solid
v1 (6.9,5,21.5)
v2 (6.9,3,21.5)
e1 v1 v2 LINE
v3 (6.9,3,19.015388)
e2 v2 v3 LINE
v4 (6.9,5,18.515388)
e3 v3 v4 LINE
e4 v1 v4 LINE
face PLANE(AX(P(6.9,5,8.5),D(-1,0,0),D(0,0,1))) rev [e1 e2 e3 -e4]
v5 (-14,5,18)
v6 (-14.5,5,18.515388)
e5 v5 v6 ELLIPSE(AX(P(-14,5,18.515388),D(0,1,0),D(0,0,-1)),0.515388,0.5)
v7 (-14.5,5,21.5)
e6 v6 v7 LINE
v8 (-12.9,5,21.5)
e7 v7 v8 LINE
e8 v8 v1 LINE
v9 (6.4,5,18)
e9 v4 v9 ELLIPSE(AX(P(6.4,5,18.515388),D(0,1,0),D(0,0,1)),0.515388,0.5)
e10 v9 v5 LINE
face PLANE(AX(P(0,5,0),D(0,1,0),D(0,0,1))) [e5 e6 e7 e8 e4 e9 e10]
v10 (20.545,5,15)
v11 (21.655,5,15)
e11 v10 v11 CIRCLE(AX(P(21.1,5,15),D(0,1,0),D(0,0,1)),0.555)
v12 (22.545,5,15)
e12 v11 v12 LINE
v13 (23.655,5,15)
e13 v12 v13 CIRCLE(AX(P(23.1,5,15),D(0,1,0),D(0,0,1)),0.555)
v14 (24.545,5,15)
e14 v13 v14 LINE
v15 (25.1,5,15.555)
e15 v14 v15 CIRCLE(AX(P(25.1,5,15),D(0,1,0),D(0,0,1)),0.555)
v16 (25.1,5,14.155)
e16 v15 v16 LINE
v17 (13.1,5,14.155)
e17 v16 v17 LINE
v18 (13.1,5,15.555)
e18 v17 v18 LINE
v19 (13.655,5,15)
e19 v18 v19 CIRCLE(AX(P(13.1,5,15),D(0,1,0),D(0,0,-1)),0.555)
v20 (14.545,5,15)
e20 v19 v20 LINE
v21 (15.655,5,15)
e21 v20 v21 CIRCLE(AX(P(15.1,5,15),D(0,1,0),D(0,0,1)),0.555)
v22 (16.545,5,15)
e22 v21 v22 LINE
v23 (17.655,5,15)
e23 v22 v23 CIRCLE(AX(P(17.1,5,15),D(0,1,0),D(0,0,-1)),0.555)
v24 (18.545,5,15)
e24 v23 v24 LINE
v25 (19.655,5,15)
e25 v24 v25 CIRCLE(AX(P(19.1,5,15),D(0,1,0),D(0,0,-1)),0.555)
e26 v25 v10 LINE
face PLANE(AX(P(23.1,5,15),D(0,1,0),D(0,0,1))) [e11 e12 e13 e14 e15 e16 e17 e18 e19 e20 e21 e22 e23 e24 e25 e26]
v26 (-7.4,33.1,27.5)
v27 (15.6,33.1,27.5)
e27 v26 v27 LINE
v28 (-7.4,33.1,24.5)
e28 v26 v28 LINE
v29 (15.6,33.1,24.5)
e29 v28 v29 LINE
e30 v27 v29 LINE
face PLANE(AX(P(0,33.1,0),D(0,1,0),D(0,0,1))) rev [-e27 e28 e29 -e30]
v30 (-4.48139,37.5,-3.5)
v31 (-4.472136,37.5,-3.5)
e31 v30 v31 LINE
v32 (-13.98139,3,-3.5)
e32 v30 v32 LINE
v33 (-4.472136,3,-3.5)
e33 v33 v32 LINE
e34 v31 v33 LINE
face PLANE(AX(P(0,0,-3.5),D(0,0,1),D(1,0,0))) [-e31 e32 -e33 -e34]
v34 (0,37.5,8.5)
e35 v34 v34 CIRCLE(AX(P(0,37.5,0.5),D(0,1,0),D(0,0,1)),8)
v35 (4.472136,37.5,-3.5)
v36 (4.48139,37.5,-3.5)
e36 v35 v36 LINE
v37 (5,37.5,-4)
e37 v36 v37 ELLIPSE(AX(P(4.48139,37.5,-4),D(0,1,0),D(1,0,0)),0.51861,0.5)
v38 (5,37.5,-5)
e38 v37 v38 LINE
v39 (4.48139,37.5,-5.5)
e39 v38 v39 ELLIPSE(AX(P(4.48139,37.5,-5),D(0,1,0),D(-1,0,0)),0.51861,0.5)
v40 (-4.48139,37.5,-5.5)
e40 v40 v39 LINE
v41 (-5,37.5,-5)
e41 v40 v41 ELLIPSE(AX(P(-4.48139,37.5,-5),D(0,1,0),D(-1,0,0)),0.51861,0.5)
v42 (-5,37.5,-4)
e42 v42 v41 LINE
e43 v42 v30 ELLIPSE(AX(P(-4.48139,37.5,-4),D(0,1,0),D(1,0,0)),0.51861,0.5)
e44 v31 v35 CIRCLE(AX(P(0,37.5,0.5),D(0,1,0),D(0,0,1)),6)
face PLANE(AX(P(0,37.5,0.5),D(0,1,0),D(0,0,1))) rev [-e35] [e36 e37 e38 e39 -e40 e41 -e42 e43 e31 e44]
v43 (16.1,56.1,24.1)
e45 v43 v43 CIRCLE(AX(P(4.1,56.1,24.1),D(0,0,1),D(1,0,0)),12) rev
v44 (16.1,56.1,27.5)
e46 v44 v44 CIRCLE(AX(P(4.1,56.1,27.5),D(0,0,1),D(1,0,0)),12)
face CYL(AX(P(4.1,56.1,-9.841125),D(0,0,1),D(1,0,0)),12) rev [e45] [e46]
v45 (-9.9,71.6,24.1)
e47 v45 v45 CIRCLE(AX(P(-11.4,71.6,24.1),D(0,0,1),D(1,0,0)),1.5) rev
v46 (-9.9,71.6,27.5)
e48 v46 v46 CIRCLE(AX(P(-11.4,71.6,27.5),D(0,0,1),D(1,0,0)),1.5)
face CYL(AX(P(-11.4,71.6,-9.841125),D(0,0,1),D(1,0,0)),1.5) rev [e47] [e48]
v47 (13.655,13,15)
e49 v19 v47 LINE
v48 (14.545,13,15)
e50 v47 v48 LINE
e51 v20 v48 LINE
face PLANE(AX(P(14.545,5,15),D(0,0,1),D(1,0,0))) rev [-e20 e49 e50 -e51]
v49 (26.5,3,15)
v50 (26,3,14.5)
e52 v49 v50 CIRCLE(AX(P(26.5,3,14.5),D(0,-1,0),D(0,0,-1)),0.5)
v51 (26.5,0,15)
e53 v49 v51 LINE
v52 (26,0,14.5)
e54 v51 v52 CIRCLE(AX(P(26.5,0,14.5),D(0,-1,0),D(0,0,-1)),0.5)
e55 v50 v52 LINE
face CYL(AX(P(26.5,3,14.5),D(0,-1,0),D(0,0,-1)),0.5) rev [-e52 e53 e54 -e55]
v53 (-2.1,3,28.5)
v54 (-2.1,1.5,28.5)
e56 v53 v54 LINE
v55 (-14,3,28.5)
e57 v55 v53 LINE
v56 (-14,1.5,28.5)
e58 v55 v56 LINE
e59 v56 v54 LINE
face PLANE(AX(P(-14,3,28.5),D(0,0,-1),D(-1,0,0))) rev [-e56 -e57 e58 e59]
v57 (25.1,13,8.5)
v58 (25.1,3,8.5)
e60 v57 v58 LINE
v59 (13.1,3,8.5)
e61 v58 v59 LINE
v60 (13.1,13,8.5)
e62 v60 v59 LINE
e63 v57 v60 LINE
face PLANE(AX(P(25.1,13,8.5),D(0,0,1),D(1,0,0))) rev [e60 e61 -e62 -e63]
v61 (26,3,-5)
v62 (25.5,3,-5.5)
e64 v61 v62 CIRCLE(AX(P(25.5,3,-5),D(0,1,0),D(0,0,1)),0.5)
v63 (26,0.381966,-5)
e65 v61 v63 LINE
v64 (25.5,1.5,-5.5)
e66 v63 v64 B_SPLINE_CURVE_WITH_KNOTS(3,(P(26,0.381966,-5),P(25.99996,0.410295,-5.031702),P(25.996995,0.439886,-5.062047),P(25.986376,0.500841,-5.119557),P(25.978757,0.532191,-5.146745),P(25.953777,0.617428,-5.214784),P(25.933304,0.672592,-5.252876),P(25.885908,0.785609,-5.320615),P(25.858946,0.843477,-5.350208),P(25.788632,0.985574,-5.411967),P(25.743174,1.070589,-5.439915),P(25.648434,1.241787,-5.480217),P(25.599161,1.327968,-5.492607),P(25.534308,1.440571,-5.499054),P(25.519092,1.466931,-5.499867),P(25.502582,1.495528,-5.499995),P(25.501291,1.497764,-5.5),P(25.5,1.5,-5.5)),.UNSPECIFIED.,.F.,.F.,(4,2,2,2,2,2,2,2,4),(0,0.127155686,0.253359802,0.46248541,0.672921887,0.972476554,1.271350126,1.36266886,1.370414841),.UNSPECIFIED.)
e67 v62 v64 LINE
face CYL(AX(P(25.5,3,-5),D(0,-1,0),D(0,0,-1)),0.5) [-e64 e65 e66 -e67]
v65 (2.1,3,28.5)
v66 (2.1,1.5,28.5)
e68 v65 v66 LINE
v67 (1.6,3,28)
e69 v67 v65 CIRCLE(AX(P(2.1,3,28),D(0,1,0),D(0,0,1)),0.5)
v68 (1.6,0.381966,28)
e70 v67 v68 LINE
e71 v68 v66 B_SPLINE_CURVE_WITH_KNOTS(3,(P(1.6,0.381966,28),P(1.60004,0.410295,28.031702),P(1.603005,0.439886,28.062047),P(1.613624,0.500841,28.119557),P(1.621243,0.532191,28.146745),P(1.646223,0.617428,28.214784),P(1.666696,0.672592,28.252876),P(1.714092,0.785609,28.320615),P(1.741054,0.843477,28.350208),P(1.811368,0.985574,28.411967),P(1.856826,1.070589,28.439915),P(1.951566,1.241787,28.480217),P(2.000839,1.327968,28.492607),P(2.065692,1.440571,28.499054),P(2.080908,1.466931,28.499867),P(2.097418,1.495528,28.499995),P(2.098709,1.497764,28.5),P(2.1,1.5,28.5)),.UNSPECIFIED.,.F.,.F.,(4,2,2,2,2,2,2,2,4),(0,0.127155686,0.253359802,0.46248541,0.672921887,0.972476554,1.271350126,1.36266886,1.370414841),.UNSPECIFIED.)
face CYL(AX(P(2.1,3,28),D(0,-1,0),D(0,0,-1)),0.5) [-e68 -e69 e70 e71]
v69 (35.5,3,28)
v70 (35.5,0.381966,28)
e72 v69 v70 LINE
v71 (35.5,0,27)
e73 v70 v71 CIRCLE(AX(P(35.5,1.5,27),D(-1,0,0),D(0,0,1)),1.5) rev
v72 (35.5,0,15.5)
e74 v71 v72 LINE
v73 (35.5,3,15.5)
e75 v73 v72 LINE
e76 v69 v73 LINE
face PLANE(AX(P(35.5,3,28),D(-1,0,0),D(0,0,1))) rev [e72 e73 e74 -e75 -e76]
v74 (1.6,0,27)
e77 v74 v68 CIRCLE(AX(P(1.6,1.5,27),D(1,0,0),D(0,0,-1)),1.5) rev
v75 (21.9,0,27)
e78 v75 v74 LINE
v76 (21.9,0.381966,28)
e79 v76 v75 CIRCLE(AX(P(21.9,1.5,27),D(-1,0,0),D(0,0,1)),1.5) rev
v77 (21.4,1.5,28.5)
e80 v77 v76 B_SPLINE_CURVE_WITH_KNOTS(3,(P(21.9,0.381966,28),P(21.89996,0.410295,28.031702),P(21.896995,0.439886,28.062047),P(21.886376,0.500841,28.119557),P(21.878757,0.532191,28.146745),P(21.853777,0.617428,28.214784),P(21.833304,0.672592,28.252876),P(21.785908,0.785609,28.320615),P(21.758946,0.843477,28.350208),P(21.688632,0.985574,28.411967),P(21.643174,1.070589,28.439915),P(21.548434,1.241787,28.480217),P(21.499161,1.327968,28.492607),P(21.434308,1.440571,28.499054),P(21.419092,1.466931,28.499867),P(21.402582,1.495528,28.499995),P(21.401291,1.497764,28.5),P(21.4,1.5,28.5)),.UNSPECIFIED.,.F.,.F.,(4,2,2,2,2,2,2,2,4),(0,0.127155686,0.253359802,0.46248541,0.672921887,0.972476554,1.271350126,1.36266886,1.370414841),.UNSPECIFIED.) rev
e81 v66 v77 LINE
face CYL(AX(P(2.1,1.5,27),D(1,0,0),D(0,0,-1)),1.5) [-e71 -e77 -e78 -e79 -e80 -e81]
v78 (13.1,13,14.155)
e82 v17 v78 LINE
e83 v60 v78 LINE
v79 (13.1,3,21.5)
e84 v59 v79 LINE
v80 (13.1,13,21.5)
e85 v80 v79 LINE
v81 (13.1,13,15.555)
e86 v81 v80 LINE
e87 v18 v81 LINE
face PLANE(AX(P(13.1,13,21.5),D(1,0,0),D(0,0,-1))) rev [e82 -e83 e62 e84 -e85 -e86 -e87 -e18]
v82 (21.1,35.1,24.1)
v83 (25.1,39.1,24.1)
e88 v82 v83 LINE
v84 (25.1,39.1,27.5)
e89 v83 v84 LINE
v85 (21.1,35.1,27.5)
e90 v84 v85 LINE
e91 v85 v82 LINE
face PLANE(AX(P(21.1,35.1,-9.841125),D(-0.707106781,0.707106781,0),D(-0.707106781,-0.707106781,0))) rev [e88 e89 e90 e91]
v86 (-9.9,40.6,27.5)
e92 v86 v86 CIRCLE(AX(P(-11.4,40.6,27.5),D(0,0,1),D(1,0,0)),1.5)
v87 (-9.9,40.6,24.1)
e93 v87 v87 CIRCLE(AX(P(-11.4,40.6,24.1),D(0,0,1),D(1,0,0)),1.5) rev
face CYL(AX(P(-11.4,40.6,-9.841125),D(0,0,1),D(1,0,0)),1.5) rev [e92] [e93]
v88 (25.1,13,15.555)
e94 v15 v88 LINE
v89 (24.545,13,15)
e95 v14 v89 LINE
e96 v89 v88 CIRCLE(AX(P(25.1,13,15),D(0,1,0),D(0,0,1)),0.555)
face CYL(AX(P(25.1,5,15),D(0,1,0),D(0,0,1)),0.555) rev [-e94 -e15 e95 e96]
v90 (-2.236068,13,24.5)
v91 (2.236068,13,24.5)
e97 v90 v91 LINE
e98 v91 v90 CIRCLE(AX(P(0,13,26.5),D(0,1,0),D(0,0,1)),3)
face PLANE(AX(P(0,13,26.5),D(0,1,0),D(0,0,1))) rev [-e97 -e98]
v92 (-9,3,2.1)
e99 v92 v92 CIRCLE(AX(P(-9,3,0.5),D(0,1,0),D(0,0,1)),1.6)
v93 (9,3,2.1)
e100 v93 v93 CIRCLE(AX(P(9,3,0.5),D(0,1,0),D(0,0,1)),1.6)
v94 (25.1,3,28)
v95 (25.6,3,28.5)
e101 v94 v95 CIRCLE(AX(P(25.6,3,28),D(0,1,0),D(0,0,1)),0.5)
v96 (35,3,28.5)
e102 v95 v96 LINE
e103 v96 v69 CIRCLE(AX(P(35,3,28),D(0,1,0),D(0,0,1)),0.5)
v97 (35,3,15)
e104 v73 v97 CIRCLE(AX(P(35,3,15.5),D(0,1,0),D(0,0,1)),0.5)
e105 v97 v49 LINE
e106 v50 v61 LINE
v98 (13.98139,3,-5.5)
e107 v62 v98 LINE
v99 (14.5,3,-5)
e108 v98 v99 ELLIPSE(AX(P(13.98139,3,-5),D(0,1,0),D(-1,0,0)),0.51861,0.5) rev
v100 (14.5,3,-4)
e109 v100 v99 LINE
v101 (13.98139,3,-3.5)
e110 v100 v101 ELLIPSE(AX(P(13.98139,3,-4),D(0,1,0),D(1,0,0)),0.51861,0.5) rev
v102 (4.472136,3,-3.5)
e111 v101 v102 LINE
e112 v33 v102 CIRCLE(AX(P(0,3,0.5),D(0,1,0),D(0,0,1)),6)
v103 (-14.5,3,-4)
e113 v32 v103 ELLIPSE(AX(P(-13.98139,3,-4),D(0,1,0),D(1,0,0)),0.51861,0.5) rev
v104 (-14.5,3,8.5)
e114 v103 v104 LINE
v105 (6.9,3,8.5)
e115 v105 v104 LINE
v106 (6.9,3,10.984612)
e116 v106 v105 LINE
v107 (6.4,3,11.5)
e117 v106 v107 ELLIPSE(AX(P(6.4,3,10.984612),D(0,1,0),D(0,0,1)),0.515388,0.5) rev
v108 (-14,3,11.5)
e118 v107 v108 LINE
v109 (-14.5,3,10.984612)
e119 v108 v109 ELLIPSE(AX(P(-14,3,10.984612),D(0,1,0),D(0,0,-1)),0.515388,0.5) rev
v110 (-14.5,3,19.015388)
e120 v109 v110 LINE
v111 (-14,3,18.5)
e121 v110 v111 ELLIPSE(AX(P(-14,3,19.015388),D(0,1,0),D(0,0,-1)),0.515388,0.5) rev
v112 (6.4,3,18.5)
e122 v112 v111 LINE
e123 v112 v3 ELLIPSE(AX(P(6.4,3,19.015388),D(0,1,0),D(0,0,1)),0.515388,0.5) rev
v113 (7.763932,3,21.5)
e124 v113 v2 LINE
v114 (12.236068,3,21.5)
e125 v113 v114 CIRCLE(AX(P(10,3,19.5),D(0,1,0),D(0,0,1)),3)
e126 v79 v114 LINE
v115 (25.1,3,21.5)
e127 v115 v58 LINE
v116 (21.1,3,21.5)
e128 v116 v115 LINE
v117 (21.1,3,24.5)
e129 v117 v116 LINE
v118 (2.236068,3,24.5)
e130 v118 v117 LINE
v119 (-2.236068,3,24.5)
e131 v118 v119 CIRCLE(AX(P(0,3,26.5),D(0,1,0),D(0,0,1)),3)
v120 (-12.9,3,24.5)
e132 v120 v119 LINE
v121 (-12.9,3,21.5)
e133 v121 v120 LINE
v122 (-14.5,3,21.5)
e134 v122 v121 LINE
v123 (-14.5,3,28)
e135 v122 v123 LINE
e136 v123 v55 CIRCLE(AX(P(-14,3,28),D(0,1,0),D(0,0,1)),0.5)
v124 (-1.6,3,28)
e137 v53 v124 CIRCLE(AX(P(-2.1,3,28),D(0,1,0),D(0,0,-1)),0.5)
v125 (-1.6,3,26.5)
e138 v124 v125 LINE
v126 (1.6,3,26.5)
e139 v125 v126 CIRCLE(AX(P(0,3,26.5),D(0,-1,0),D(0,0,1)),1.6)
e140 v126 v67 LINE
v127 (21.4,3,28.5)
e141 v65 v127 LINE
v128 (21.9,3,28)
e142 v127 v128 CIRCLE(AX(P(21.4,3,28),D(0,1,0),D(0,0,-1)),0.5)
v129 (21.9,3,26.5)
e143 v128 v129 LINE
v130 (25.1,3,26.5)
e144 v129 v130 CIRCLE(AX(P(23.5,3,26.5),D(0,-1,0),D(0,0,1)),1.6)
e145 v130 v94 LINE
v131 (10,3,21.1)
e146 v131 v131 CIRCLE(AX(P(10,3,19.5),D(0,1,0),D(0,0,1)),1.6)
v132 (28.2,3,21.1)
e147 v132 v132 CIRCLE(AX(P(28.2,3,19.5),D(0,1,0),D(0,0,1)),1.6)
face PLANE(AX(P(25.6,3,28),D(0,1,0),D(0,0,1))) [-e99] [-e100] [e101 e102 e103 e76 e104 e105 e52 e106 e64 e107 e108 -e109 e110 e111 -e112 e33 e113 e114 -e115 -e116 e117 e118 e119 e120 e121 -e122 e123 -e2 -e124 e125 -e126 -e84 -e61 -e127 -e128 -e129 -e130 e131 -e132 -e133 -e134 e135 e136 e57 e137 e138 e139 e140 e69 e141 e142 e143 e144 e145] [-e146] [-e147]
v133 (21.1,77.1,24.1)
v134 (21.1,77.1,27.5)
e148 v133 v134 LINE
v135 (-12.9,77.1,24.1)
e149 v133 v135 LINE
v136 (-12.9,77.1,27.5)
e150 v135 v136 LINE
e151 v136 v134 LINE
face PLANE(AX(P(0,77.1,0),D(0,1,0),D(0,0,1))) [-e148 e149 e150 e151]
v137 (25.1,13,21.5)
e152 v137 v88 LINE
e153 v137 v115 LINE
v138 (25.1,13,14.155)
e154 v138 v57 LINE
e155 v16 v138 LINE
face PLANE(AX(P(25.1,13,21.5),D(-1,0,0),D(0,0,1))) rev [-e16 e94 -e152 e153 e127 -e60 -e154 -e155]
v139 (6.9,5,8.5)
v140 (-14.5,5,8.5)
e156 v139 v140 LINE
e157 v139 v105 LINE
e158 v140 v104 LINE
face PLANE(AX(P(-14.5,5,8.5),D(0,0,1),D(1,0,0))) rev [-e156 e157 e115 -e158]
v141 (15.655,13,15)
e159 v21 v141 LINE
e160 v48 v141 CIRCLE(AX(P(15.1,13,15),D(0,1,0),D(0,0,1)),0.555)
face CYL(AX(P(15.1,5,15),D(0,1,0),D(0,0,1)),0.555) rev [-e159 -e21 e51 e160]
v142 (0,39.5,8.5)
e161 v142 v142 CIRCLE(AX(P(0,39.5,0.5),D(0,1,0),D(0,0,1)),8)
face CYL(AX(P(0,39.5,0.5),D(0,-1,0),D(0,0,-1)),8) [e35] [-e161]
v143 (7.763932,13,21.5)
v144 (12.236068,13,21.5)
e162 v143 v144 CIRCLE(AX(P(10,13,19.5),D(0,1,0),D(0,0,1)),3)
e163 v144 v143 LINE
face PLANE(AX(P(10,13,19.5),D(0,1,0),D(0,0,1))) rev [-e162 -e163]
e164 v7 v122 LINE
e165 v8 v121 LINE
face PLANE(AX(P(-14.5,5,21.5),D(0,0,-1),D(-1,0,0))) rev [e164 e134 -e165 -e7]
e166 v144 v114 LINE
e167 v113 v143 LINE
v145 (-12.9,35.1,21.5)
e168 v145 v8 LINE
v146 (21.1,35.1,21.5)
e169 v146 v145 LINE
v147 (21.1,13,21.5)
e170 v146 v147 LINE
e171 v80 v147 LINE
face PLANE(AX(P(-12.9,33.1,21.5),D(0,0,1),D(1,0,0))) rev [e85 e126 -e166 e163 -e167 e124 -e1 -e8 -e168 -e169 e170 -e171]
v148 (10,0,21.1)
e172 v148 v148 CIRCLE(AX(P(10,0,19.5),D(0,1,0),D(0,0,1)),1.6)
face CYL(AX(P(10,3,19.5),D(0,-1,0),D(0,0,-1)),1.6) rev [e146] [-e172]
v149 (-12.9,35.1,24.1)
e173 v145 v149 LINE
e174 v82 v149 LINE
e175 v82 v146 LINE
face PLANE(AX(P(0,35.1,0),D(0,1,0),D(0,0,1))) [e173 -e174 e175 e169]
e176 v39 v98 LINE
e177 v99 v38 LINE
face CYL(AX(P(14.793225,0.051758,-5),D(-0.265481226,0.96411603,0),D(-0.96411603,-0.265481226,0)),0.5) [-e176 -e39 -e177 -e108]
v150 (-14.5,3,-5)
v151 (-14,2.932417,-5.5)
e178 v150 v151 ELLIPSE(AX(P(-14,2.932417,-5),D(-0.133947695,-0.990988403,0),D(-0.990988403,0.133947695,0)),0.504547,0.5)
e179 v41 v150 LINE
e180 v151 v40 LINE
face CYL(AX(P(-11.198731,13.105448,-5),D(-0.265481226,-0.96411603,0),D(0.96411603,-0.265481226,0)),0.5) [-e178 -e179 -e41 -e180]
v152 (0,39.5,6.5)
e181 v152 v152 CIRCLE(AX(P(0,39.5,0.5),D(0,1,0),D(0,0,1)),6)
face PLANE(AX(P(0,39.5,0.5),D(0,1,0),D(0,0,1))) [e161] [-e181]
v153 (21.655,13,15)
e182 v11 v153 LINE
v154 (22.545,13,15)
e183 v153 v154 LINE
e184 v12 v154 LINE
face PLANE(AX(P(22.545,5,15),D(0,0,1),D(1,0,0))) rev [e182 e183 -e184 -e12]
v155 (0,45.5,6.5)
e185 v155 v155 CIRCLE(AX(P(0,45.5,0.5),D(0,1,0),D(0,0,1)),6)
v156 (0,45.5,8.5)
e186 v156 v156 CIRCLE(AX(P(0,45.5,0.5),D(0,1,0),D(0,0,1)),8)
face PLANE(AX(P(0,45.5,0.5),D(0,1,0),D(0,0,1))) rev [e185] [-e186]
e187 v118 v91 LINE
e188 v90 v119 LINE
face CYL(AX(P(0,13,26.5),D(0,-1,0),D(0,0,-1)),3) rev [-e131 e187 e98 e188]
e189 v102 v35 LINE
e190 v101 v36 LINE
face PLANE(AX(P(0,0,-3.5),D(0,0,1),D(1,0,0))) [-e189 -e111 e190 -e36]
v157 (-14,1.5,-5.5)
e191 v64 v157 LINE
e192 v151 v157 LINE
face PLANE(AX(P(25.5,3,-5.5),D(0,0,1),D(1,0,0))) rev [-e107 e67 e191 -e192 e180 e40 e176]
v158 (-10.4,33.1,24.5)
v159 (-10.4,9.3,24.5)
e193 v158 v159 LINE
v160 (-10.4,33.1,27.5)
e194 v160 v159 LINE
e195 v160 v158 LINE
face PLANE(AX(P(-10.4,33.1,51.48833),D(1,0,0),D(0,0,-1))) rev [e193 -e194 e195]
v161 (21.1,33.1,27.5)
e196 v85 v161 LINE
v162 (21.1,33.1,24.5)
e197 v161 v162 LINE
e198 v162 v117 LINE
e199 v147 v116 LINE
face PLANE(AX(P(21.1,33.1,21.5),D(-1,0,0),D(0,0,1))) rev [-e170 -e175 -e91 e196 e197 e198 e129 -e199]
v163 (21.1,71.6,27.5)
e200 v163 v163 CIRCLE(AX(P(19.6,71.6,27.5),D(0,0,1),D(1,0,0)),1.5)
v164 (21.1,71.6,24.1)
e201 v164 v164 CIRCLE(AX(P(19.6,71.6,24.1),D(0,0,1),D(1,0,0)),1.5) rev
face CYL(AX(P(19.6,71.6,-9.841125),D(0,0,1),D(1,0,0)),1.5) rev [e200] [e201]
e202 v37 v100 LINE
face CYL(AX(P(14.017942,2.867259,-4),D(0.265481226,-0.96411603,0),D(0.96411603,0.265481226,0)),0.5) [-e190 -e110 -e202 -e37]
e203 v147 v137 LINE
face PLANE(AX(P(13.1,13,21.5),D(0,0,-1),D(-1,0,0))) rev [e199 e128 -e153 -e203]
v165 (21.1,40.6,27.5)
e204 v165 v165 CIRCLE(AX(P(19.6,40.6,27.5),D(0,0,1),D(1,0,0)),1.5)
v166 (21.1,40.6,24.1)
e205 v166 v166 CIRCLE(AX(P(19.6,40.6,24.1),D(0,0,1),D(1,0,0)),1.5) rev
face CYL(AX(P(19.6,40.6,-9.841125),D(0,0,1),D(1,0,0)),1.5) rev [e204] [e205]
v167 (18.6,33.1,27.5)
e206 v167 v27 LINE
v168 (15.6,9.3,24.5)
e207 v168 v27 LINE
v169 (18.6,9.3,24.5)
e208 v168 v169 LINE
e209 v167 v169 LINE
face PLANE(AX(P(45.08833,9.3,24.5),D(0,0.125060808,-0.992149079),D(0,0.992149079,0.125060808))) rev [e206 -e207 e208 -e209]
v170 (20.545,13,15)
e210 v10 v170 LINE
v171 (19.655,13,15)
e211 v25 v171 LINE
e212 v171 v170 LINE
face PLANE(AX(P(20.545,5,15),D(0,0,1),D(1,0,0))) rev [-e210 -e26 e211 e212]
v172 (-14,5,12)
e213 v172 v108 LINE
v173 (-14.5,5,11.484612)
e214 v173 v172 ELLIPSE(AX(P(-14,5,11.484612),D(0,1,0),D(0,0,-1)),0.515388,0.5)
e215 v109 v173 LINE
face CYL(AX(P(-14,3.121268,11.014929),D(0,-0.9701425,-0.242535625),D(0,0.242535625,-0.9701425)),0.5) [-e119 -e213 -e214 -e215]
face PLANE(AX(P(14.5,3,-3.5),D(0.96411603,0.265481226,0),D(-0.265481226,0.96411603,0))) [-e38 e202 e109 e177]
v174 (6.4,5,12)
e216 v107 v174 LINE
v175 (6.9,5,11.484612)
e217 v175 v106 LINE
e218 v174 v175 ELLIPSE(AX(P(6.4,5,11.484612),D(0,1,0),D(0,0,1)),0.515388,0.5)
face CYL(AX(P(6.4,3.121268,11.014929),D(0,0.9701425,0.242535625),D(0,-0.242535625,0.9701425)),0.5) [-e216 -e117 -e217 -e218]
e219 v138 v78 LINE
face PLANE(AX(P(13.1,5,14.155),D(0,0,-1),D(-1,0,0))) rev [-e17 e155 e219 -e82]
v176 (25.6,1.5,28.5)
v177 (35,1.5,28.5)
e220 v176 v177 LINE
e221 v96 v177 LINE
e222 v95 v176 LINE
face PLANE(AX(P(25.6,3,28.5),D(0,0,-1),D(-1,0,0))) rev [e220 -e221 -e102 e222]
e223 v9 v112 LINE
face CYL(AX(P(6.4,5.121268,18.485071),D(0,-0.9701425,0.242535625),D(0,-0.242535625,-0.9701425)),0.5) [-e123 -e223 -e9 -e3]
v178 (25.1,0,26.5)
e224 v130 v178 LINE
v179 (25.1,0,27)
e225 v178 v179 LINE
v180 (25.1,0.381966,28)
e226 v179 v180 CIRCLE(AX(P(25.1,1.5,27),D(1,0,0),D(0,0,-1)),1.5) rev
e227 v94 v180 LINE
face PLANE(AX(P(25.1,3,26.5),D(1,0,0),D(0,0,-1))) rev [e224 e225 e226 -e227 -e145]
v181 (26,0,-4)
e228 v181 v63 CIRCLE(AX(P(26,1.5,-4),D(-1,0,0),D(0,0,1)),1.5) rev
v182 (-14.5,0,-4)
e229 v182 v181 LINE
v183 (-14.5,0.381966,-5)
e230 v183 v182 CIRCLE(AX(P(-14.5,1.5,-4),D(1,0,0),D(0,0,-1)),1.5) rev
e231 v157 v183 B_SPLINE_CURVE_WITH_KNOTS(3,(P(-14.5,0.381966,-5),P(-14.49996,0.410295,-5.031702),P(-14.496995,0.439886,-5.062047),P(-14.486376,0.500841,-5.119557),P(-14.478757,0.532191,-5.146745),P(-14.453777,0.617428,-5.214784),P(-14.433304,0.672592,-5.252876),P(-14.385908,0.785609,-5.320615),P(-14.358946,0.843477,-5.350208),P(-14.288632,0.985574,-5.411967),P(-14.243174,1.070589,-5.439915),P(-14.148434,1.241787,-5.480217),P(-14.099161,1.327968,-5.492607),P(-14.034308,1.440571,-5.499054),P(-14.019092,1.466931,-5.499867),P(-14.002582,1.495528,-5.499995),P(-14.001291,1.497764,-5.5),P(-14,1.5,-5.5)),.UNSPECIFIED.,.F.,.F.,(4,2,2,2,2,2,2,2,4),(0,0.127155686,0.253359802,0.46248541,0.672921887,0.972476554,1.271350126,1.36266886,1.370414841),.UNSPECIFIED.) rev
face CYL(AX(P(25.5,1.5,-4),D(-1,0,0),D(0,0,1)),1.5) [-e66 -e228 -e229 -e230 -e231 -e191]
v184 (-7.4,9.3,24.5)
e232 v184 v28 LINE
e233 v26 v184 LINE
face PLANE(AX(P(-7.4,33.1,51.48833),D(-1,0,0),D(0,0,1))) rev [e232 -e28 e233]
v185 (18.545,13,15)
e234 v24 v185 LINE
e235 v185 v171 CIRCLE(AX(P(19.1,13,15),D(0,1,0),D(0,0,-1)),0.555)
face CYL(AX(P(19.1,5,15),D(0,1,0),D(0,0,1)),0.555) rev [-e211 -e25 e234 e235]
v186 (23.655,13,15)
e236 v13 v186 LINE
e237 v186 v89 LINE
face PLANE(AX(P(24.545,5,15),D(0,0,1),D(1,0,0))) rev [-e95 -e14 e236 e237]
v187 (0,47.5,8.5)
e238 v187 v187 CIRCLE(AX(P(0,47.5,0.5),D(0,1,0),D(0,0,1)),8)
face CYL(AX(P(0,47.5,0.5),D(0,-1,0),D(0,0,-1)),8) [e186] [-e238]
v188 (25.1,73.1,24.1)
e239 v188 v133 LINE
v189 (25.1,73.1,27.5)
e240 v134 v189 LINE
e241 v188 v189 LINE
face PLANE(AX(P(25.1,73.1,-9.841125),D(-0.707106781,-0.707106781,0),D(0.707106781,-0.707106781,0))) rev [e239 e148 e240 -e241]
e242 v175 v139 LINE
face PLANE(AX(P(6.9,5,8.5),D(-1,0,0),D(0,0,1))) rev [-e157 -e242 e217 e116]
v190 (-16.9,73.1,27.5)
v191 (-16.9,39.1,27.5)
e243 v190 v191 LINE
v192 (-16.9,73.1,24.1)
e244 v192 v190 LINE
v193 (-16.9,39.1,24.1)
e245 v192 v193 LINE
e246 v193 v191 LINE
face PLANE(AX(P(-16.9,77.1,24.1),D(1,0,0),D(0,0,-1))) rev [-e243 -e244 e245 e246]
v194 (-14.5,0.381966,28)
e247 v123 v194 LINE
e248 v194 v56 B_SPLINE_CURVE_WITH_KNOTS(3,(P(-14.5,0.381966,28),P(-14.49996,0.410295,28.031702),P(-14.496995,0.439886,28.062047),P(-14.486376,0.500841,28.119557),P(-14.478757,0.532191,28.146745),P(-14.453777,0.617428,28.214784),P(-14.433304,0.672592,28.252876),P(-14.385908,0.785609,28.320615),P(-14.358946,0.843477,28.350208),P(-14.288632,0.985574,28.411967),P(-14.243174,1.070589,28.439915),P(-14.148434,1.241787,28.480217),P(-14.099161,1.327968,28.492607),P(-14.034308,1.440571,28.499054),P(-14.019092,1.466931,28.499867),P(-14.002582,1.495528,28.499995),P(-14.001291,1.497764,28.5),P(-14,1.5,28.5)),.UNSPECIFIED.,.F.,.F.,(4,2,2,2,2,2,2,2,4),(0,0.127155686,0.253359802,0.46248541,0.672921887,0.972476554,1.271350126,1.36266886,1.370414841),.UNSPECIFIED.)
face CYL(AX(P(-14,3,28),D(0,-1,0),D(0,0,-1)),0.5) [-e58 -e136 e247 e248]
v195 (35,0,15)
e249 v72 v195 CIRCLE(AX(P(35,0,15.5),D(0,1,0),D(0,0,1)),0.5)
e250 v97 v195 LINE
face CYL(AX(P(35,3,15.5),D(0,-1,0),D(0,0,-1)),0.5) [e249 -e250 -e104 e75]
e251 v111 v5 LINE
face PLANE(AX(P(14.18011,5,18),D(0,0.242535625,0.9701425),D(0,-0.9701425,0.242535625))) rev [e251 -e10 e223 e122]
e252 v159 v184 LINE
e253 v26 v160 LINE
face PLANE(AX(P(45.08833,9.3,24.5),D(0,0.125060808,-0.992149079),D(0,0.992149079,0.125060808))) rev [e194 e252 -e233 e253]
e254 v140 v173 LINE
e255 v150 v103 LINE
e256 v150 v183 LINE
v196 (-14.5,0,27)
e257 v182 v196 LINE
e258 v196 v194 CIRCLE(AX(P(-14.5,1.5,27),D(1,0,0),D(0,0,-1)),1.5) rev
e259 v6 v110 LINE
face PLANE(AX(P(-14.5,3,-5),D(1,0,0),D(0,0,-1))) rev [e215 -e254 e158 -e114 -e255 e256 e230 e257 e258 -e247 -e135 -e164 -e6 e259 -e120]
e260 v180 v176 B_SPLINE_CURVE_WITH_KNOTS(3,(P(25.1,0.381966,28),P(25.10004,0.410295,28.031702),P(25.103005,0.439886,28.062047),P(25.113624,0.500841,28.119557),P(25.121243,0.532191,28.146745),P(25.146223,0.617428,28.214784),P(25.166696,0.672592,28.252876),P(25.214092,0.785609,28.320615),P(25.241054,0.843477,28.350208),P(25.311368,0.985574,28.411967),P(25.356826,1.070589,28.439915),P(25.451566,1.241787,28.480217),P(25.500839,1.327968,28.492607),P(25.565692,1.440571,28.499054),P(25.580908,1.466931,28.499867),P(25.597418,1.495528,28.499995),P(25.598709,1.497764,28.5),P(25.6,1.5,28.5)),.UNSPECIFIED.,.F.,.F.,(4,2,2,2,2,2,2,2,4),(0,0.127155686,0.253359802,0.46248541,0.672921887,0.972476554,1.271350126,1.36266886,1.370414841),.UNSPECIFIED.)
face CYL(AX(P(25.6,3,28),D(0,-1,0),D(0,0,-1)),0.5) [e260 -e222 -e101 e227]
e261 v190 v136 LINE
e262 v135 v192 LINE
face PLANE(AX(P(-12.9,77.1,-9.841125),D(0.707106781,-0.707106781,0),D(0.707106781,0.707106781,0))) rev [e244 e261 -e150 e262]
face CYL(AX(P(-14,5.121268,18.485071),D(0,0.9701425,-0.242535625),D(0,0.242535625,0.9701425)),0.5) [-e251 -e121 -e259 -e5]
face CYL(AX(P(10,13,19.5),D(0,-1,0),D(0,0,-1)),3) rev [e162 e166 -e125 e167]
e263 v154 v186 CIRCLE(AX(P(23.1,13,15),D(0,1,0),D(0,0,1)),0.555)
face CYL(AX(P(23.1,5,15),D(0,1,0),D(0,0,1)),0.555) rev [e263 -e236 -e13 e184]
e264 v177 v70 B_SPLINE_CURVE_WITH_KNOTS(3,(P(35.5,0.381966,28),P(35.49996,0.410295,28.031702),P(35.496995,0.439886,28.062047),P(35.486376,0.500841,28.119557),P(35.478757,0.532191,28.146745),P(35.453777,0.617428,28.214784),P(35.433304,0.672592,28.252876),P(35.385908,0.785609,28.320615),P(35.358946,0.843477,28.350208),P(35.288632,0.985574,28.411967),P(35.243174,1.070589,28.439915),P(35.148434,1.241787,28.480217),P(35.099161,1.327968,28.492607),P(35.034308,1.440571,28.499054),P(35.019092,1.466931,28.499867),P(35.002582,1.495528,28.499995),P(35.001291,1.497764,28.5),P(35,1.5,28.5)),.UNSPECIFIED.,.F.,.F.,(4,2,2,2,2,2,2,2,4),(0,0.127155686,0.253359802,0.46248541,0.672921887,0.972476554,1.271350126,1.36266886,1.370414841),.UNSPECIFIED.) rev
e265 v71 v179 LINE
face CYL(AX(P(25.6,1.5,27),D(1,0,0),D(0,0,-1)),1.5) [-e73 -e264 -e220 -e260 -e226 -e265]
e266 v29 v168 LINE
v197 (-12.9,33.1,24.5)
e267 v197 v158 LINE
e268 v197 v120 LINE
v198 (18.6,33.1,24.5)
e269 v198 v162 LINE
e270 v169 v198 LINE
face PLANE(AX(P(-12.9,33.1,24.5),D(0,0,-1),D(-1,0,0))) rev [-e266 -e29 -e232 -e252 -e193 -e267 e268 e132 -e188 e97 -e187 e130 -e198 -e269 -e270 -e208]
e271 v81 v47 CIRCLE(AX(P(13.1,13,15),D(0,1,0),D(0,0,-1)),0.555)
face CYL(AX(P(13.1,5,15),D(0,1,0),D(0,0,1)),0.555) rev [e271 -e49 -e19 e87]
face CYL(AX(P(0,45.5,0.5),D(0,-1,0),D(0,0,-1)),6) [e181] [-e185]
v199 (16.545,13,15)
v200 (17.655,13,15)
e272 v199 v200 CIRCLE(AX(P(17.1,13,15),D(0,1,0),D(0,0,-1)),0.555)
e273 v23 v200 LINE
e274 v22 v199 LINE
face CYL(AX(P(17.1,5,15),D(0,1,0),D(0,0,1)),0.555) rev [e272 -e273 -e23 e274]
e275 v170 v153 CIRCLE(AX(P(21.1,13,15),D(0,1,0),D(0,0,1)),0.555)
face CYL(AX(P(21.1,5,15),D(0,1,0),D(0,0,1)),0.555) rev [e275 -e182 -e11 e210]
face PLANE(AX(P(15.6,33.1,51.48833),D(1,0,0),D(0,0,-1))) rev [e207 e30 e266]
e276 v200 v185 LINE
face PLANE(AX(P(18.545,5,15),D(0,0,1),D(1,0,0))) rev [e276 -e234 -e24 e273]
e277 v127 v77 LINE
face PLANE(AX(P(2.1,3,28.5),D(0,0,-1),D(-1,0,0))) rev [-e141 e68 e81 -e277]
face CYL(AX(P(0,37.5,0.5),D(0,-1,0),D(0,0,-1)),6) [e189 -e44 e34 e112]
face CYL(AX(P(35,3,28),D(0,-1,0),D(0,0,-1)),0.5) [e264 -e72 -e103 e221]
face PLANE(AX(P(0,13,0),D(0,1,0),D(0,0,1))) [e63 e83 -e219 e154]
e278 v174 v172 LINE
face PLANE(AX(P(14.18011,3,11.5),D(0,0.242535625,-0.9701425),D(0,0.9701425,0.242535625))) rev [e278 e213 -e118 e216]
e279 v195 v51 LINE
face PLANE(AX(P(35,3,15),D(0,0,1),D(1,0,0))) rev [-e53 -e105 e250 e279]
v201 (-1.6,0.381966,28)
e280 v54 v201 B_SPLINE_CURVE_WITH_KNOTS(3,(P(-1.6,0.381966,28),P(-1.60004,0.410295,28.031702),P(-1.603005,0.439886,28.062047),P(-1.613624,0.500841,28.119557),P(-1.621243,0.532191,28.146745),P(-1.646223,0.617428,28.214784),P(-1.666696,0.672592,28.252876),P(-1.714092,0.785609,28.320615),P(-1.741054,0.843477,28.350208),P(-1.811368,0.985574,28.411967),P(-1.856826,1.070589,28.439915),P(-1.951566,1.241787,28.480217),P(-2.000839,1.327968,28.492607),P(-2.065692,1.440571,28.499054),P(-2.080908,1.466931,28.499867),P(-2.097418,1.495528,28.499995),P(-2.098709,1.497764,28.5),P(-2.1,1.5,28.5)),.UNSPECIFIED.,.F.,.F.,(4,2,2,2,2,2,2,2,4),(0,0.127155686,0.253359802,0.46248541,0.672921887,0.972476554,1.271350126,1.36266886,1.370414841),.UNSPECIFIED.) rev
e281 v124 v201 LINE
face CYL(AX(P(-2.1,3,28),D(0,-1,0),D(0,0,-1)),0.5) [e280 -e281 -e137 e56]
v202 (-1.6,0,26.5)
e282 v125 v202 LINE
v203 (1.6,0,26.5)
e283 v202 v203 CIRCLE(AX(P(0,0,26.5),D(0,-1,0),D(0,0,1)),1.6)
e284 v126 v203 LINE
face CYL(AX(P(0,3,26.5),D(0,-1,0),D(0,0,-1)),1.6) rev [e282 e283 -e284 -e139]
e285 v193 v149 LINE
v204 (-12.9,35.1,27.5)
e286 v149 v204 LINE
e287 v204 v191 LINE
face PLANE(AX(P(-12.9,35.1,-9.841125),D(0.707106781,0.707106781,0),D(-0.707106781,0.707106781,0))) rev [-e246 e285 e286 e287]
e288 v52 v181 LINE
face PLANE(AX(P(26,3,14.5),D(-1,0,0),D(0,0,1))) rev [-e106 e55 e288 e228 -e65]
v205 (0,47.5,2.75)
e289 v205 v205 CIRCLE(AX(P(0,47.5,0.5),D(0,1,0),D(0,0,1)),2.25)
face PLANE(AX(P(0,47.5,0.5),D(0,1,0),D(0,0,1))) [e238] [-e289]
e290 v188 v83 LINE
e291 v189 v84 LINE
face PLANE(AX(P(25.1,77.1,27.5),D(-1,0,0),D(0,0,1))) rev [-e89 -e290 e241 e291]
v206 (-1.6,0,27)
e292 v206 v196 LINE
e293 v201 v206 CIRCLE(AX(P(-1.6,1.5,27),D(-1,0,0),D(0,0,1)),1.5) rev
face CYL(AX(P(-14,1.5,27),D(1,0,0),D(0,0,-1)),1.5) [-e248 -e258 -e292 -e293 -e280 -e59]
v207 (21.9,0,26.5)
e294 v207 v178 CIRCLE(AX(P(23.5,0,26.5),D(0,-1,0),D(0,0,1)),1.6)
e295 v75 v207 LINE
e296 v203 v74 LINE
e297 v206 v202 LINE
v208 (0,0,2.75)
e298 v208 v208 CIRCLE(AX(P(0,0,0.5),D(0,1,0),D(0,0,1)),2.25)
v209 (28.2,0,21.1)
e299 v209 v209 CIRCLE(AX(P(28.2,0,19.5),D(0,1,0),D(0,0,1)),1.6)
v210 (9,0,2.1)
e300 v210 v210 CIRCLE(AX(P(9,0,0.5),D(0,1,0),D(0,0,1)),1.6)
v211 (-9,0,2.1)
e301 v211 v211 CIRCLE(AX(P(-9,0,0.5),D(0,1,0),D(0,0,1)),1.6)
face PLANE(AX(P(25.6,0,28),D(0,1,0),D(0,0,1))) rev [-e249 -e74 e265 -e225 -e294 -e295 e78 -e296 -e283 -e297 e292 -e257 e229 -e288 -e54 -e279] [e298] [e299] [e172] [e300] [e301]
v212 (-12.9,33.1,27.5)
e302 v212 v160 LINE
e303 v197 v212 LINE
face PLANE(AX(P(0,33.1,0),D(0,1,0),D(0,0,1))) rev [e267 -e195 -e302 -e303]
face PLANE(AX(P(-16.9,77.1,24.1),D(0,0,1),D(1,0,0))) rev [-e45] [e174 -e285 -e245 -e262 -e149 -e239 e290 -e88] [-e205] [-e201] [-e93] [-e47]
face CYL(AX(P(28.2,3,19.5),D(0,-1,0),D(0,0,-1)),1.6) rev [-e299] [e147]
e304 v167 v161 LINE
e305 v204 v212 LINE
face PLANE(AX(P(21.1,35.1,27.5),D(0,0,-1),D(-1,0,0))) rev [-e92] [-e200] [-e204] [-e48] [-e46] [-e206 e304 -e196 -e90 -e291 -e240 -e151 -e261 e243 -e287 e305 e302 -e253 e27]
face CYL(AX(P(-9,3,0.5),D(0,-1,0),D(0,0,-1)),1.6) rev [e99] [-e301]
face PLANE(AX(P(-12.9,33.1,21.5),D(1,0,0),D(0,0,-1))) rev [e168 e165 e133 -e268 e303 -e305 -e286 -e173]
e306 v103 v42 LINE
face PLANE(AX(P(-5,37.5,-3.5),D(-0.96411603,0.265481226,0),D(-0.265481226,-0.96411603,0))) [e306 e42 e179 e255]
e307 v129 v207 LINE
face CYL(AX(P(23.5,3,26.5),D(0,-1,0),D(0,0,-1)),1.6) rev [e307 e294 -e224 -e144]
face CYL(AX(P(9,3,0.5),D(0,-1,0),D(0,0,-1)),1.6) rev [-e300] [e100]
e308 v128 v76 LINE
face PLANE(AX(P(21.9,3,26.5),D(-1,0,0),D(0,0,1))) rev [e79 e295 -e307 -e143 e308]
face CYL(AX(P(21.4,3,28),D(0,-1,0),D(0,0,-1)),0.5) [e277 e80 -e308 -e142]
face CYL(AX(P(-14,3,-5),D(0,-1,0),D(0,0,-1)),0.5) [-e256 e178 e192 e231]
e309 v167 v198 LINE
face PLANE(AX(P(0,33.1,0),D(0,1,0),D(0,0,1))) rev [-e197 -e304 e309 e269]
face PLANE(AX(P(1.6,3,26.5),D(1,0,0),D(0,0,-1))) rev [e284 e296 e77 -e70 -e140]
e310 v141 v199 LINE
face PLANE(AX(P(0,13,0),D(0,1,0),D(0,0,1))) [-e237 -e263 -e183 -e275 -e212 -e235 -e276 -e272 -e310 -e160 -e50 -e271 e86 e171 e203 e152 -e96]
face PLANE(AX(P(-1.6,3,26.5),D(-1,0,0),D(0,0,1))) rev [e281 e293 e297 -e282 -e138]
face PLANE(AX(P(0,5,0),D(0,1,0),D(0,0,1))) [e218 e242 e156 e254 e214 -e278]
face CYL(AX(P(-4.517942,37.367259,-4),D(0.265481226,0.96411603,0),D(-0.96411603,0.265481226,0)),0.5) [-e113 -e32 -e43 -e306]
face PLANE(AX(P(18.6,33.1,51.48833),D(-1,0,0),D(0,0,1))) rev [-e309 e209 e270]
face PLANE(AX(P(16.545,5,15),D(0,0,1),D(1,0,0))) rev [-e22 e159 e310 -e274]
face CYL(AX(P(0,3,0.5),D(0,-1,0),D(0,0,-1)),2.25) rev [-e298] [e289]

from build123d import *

# Parameters (mm, degrees)
SKETCH2_R            = 2.25
SKETCH2_R_2          = 1.6
BOSS_EXTRUDE1_DEPTH  = 3
FILLET1_R            = 1.5
SKETCH5_R            = 6
SKETCH5_R_2          = 2.25
BOSS_EXTRUDE3_DEPTH  = 34.5
SKETCH6_R            = 8
SKETCH6_R_2          = 2.25
BOSS_EXTRUDE4_DEPTH  = 2
SKETCH7_R            = 6
SKETCH7_R_2          = 2.25
BOSS_EXTRUDE5_DEPTH  = 6
SKETCH13_W           = 34
SKETCH13_H           = 3
BOSS_EXTRUDE8_DEPTH  = 30.1
SKETCH16_W           = 34
SKETCH16_H           = 6
BOSS_EXTRUDE10_DEPTH = 2
SKETCH17_W           = 3
SKETCH17_H           = 23.8
BOSS_EXTRUDE11_DEPTH = 3
CUT_EXTRUDE5_REACH   = 72.635
SKETCH19_W           = 42
SKETCH19_H           = 3.4
BOSS_EXTRUDE12_DEPTH = 42
SKETCH21_R           = 12
SKETCH21_R_2         = 1.5
CUT_EXTRUDE6_DEPTH   = 3.4
SKETCH28_R           = 8
SKETCH28_R_2         = 2.25
BOSS_EXTRUDE19_DEPTH = 2
BOSS_EXTRUDE20_DEPTH = 2
FILLET4_R            = 0.5
SKETCH30_W           = 12
SKETCH30_H           = 13
BOSS_EXTRUDE23_DEPTH = 10
CUT_EXTRUDE7_DEPTH   = 8
SKETCH14_R           = 3
CUT_EXTRUDE9_DEPTH   = 10
SKETCH32_W           = 21.4
SKETCH32_H           = 13
BOSS_EXTRUDE24_DEPTH = 2
CUT_EXTRUDE10_DEPTH  = 21.4
FILLET5_R            = 0.5


with BuildPart() as part:
    # Sketch2 → Boss-Extrude1 (new body)
    with BuildSketch(Plane(origin=(0, 0, 0), x_dir=(1, 0, 0), z_dir=(0, 1, 0))):
        with BuildLine():
            Line((-1.6, -26.5), (-1.6, -28))
            ThreePointArc((-1.6, -28), (-1.746446609, -28.353553391), (-2.1, -28.5))
            Line((-2.1, -28.5), (-14, -28.5))
            ThreePointArc((-14, -28.5), (-14.353553391, -28.353553391), (-14.5, -28))
            Line((-14.5, -28), (-14.5, 5))
            ThreePointArc((-14.5, 5), (-14.353553391, 5.353553391), (-14, 5.5))
            Line((-14, 5.5), (25.5, 5.5))
            ThreePointArc((25.5, 5.5), (25.853553391, 5.353553391), (26, 5))
            Line((26, 5), (26, -14.5))
            ThreePointArc((26, -14.5), (26.146446609, -14.853553391), (26.5, -15))
            Line((26.5, -15), (35, -15))
            ThreePointArc((35, -15), (35.353553391, -15.146446609), (35.5, -15.5))
            Line((35.5, -15.5), (35.5, -28))
            ThreePointArc((35.5, -28), (35.353553391, -28.353553391), (35, -28.5))
            Line((35, -28.5), (25.6, -28.5))
            ThreePointArc((25.6, -28.5), (25.246446609, -28.353553391), (25.1, -28))
            Line((25.1, -28), (25.1, -26.5))
            ThreePointArc((25.1, -26.5), (23.5, -24.9), (21.9, -26.5))
            Line((21.9, -26.5), (21.9, -28))
            ThreePointArc((21.9, -28), (21.753553391, -28.353553391), (21.4, -28.5))
            Line((21.4, -28.5), (2.1, -28.5))
            ThreePointArc((2.1, -28.5), (1.746446609, -28.353553391), (1.6, -28))
            Line((1.6, -28), (1.6, -26.5))
            ThreePointArc((1.6, -26.5), (0, -24.9), (-1.6, -26.5))
        make_face()
        with Locations(Location((0, -0.5, 0), (0, 0, 270))):
            Circle(SKETCH2_R, mode=Mode.SUBTRACT)
        with Locations(Location((-9, -0.5, 0), (0, 0, 270))):
            Circle(SKETCH2_R_2, mode=Mode.SUBTRACT)
        with Locations(Location((9, -0.5, 0), (0, 0, 270))):
            Circle(SKETCH2_R_2, mode=Mode.SUBTRACT)
        with Locations(Location((10, -19.5, 0), (0, 0, 270))):
            Circle(SKETCH2_R_2, mode=Mode.SUBTRACT)
        with Locations(Location((28.2, -19.5, 0), (0, 0, 270))):
            Circle(SKETCH2_R_2, mode=Mode.SUBTRACT)
    extrude(amount=BOSS_EXTRUDE1_DEPTH)

    # Fillet1
    # the kernel refuses this fillet: 1.5 mm, written as the material it takes off along each edge
    with BuildSketch(Plane(origin=(-17.75, 0, -5.5), x_dir=(0, 1, 0), z_dir=(1, 0, 0))) as fillet1_piece_1:
        with BuildLine():
            CenterArc((FILLET1_R, FILLET1_R), FILLET1_R, 180, 90)
            Line((0, FILLET1_R), (0, 0))
            Line((0, 0), (FILLET1_R, 0))
        make_face()
    extrude(amount=47, mode=Mode.SUBTRACT)
    with BuildSketch(Plane(origin=(1.65, 0, 28.5), x_dir=(0, 1, 0), z_dir=(-1, 0, 0))) as fillet1_piece_2:
        with BuildLine():
            CenterArc((FILLET1_R, FILLET1_R), FILLET1_R, 180, 90)
            Line((0, FILLET1_R), (0, 0))
            Line((0, 0), (FILLET1_R, 0))
        make_face()
    extrude(amount=19.4, mode=Mode.SUBTRACT)
    with BuildSketch(Plane(origin=(38.75, 0, 28.5), x_dir=(0, 1, 0), z_dir=(-1, 0, 0))) as fillet1_piece_3:
        with BuildLine():
            CenterArc((FILLET1_R, FILLET1_R), FILLET1_R, 180, 90)
            Line((0, FILLET1_R), (0, 0))
            Line((0, 0), (FILLET1_R, 0))
        make_face()
    extrude(amount=16.9, mode=Mode.SUBTRACT)
    with BuildSketch(Plane(origin=(25.15, 0, 28.5), x_dir=(0, 1, 0), z_dir=(-1, 0, 0))) as fillet1_piece_4:
        with BuildLine():
            CenterArc((FILLET1_R, FILLET1_R), FILLET1_R, 180, 90)
            Line((0, FILLET1_R), (0, 0))
            Line((0, 0), (FILLET1_R, 0))
        make_face()
    extrude(amount=26.8, mode=Mode.SUBTRACT)

    # Sketch5 → Boss-Extrude3 (add)
    with BuildSketch(Plane(origin=(0, 3, 0), x_dir=(1, 0, 0), z_dir=(0, 1, 0))):
        with Locations(Location((0, -0.5, 0), (0, 0, 90))):
            Circle(SKETCH5_R)
        with Locations(Location((0, -0.5, 0), (0, 0, 270))):
            Circle(SKETCH5_R_2, mode=Mode.SUBTRACT)
    extrude(amount=BOSS_EXTRUDE3_DEPTH)

    # Sketch6 → Boss-Extrude4 (add)
    with BuildSketch(Plane(origin=(0, 37.5, 0), x_dir=(1, 0, 0), z_dir=(0, 1, 0))):
        with Locations(Location((0, -0.5, 0), (0, 0, 270))):
            Circle(SKETCH6_R)
        with Locations(Location((0, -0.5, 0), (0, 0, 270))):
            Circle(SKETCH6_R_2, mode=Mode.SUBTRACT)
    extrude(amount=BOSS_EXTRUDE4_DEPTH)

    # Sketch7 → Boss-Extrude5 (add)
    with BuildSketch(Plane(origin=(0, 39.5, 0), x_dir=(1, 0, 0), z_dir=(0, 1, 0))):
        with Locations(Location((0, -0.5, 0), (0, 0, 90))):
            Circle(SKETCH7_R)
        with Locations(Location((0, -0.5, 0), (0, 0, 270))):
            Circle(SKETCH7_R_2, mode=Mode.SUBTRACT)
    extrude(amount=BOSS_EXTRUDE5_DEPTH)

    # Sketch13 → Boss-Extrude8 (add)
    with BuildSketch(Plane(origin=(0, 3, 0), x_dir=(1, 0, 0), z_dir=(0, 1, 0))):
        with Locations((4.1, -23)):
            Rectangle(SKETCH13_W, SKETCH13_H)
    extrude(amount=BOSS_EXTRUDE8_DEPTH)

    # Sketch16 → Boss-Extrude10 (add)
    with BuildSketch(Plane(origin=(0, 33.1, 0), x_dir=(1, 0, 0), z_dir=(0, 1, 0))):
        with Locations((4.1, -24.5)):
            Rectangle(SKETCH16_W, SKETCH16_H)
    extrude(amount=BOSS_EXTRUDE10_DEPTH)

    # Sketch17 → Boss-Extrude11 (add)
    with BuildSketch(Plane.XY.offset(24.5)):
        with Locations((-8.9, 21.2)):
            Rectangle(SKETCH17_W, SKETCH17_H)
        with Locations((17.1, 21.2)):
            Rectangle(SKETCH17_W, SKETCH17_H)
    extrude(amount=BOSS_EXTRUDE11_DEPTH)

    # Cut-Extrude5: up to this face of the body (flat: up to its plane)
    cut_extrude5_end = Plane(part.part.faces().sort_by_distance((21.1, 19.932697947, 23.175953079))[0])
    # Sketch18 → Cut-Extrude5 (cut, up to the picked face)
    with BuildSketch(Plane.ZY.offset(10.4), mode=Mode.PRIVATE) as cut_extrude5_sk1:
        Polygon((24.5, 9.3), (27.5, 33.1), (27.5, 9.3), align=None)
    cut_extrude5_tool1 = split(extrude(cut_extrude5_sk1.sketch, amount=-CUT_EXTRUDE5_REACH, mode=Mode.PRIVATE), bisect_by=cut_extrude5_end, keep=Keep.BOTH, mode=Mode.PRIVATE)
    add(cut_extrude5_tool1.solids().sort_by(Axis((-10.4, 17.233333, 26.5), (1, 0, 0)))[0], mode=Mode.SUBTRACT)

    # Sketch19 → Boss-Extrude12 (add)
    with BuildSketch(Plane(origin=(0, 35.1, 0), x_dir=(1, 0, 0), z_dir=(0, 1, 0))):
        with Locations((4.1, -25.8)):
            Rectangle(SKETCH19_W, SKETCH19_H)
    extrude(amount=BOSS_EXTRUDE12_DEPTH)

    # Sketch21 → Cut-Extrude6 (cut)
    with BuildSketch(Plane.XY.offset(27.5)):
        with Locations((4.1, 56.1)):
            Circle(SKETCH21_R)
        with Locations((-11.4, 71.6)):
            Circle(SKETCH21_R_2)
        with Locations((19.6, 40.6)):
            Circle(SKETCH21_R_2)
        with Locations((19.6, 71.6)):
            Circle(SKETCH21_R_2)
        with Locations((-11.4, 40.6)):
            Circle(SKETCH21_R_2)
        Polygon((-16.9, 77.1), (-12.9, 77.1), (-16.9, 73.1), align=None)
        Polygon((25.1, 77.1), (25.1, 73.1), (21.1, 77.1), align=None)
        Polygon((25.1, 35.1), (21.1, 35.1), (25.1, 39.1), align=None)
        Polygon((-16.9, 35.1), (-12.9, 35.1), (-16.9, 39.1), align=None)
    extrude(amount=-CUT_EXTRUDE6_DEPTH, mode=Mode.SUBTRACT)

    # Sketch28 → Boss-Extrude19 (add)
    with BuildSketch(Plane(origin=(0, 45.5, 0), x_dir=(1, 0, 0), z_dir=(0, 1, 0))):
        with Locations(Location((0, -0.5, 0), (0, 0, 270))):
            Circle(SKETCH28_R)
        with Locations(Location((0, -0.5, 0), (0, 0, 270))):
            Circle(SKETCH28_R_2, mode=Mode.SUBTRACT)
    extrude(amount=BOSS_EXTRUDE19_DEPTH)

    # Sketch29 → Boss-Extrude20 (add)
    with BuildSketch(Plane(origin=(0, 0, -5.5), x_dir=(-1, 0, 0), z_dir=(0, 0, -1))):
        Polygon((14.5, 3), (-14.5, 3), (-5, 37.5), (5, 37.5), align=None)
    extrude(amount=-BOSS_EXTRUDE20_DEPTH)

    # Fillet4
    # the kernel refuses this fillet: 0.5 mm, written as the material it takes off along each edge
    with BuildSketch(Plane(origin=(14.831851532, 1.794854963, -3.5), x_dir=(0, 0, -1), z_dir=(-0.2654812255888909, 0.9641160297701831, 0))) as fillet4_piece_1_section:
        with BuildLine():
            CenterArc((FILLET4_R, FILLET4_R), FILLET4_R, 180, 90)
            Line((0, FILLET4_R), (0, 0))
            Line((0, 0), (FILLET4_R, 0))
        make_face()
    fillet4_piece_1 = extrude(amount=38.28407467, mode=Mode.PRIVATE)
    fillet4_piece_1 = split(fillet4_piece_1, bisect_by=Plane(origin=(9.63258928, 3, -3.613197557), z_dir=(0, 1, 0)), keep=Keep.TOP, mode=Mode.PRIVATE)
    fillet4_piece_1 = split(fillet4_piece_1, bisect_by=Plane(origin=(9.63258928, 37.5, -3.613197557), z_dir=(0, -1, 0)), keep=Keep.TOP, mode=Mode.PRIVATE)
    add(fillet4_piece_1, mode=Mode.SUBTRACT)
    with BuildSketch(Plane(origin=(-4.668148468, 38.705145037, -3.5), x_dir=(0.9641160297701831, -0.265481225588891, 0), z_dir=(-0.265481225588891, -0.9641160297701831, 0))) as fillet4_piece_2_section:
        with BuildLine():
            CenterArc((FILLET4_R, -FILLET4_R), FILLET4_R, 90, 90)
            Line((0, -FILLET4_R), (0, 0))
            Line((0, 0), (FILLET4_R, 0))
        make_face()
    fillet4_piece_2 = extrude(amount=38.28407467, mode=Mode.PRIVATE)
    fillet4_piece_2 = split(fillet4_piece_2, bisect_by=Plane(origin=(-9.63258928, 37.5, -3.613197557), z_dir=(0, -1, 0)), keep=Keep.TOP, mode=Mode.PRIVATE)
    fillet4_piece_2 = split(fillet4_piece_2, bisect_by=Plane(origin=(-9.63258928, 3, -3.613197557), z_dir=(0, 1, 0)), keep=Keep.TOP, mode=Mode.PRIVATE)
    add(fillet4_piece_2, mode=Mode.SUBTRACT)
    with BuildSketch(Plane(origin=(-4.668148468, 38.705145037, -5.5), x_dir=(0.964116029770183, -0.265481225588891, 0), z_dir=(-0.265481225588891, -0.9641160297701831, 0))) as fillet4_piece_3_section:
        with BuildLine():
            CenterArc((FILLET4_R, FILLET4_R), FILLET4_R, 180, 90)
            Line((0, FILLET4_R), (0, 0))
            Line((0, 0), (FILLET4_R, 0))
        make_face()
    fillet4_piece_3 = extrude(amount=38.28407467, mode=Mode.PRIVATE)
    fillet4_piece_3 = split(fillet4_piece_3, bisect_by=Plane(origin=(-9.802566239, 37.5, -5.386853438), z_dir=(0, -1, 0)), keep=Keep.TOP, mode=Mode.PRIVATE)
    add(fillet4_piece_3, mode=Mode.SUBTRACT)
    with BuildSketch(Plane(origin=(14.831851532, 1.794854963, -5.5), x_dir=(-0.9641160297701831, -0.26548122558889087, 0), z_dir=(-0.2654812255888909, 0.9641160297701831, 0))) as fillet4_piece_4_section:
        with BuildLine():
            CenterArc((FILLET4_R, FILLET4_R), FILLET4_R, 180, 90)
            Line((0, FILLET4_R), (0, 0))
            Line((0, 0), (FILLET4_R, 0))
        make_face()
    fillet4_piece_4 = extrude(amount=38.28407467, mode=Mode.PRIVATE)
    fillet4_piece_4 = split(fillet4_piece_4, bisect_by=Plane(origin=(9.63258928, 37.5, -5.386802443), z_dir=(0, -1, 0)), keep=Keep.TOP, mode=Mode.PRIVATE)
    fillet4_piece_4 = split(fillet4_piece_4, bisect_by=Plane(origin=(9.63258928, 3, -5.386802443), z_dir=(0, 1, 0)), keep=Keep.TOP, mode=Mode.PRIVATE)
    add(fillet4_piece_4, mode=Mode.SUBTRACT)

    # Sketch30 → Boss-Extrude23 (add)
    with BuildSketch(Plane(origin=(0, 3, 0), x_dir=(1, 0, 0), z_dir=(0, 1, 0))):
        with Locations((19.1, -15)):
            Rectangle(SKETCH30_W, SKETCH30_H)
    extrude(amount=BOSS_EXTRUDE23_DEPTH)

    # Sketch4 → Cut-Extrude7 (cut)
    with BuildSketch(Plane(origin=(0, 13, 0), x_dir=(1, 0, 0), z_dir=(0, 1, 0))):
        with BuildLine():
            Line((24.545, -15), (23.655, -15))
            ThreePointArc((23.655, -15), (23.1, -15.555), (22.545, -15))
            Line((22.545, -15), (21.655, -15))
            ThreePointArc((21.655, -15), (21.1, -15.555), (20.545, -15))
            Line((20.545, -15), (19.655, -15))
            ThreePointArc((19.655, -15), (19.1, -15.555), (18.545, -15))
            Line((18.545, -15), (17.655, -15))
            ThreePointArc((17.655, -15), (17.1, -15.555), (16.545, -15))
            Line((16.545, -15), (15.655, -15))
            ThreePointArc((15.655, -15), (15.1, -15.555), (14.545, -15))
            Line((14.545, -15), (13.655, -15))
            ThreePointArc((13.655, -15), (13.492444264, -15.392444264), (13.1, -15.555))
            Line((13.1, -15.555), (13.1, -14.155))
            Line((13.1, -14.155), (25.1, -14.155))
            Line((25.1, -14.155), (25.1, -15.555))
            ThreePointArc((25.1, -15.555), (24.707555736, -15.392444264), (24.545, -15))
        make_face()
    extrude(amount=-CUT_EXTRUDE7_DEPTH, mode=Mode.SUBTRACT)

    # Sketch14 → Cut-Extrude9 (cut)
    with BuildSketch(Plane(origin=(0, 3, 0), x_dir=(1, 0, 0), z_dir=(0, 1, 0))):
        with Locations((-9, -0.5)):
            Circle(SKETCH14_R)
        with Locations((9, -0.5)):
            Circle(SKETCH14_R)
        with Locations((10, -19.5)):
            Circle(SKETCH14_R)
        with Locations((0, -26.5)):
            Circle(SKETCH14_R)
        with Locations((28.2, -19.5)):
            Circle(SKETCH14_R)
        with Locations((23.5, -26.5)):
            Circle(SKETCH14_R)
    extrude(amount=CUT_EXTRUDE9_DEPTH, mode=Mode.SUBTRACT)

    # Sketch32 → Boss-Extrude24 (add)
    with BuildSketch(Plane(origin=(0, 3, 0), x_dir=(1, 0, 0), z_dir=(0, 1, 0))):
        with Locations((-3.8, -15)):
            Rectangle(SKETCH32_W, SKETCH32_H)
    extrude(amount=BOSS_EXTRUDE24_DEPTH)

    # Sketch33 → Cut-Extrude10 (cut)
    with BuildSketch(Plane.ZY.offset(14.5)):
        Polygon((11.5, 3), (12, 5), (18, 5), (18.5, 3), align=None)
    extrude(amount=-CUT_EXTRUDE10_DEPTH, mode=Mode.SUBTRACT)

    # Fillet5
    fillet5_edges = [part.edges().sort_by_distance(p)[0] for p in [
        (-14.5, 4, 18.25),
        (-14.5, 4, 11.75),
        (6.9, 4, 11.75),
        (6.9, 4, 18.25),
    ]]
    fillet(fillet5_edges, radius=FILLET5_R)


solid = part.part
